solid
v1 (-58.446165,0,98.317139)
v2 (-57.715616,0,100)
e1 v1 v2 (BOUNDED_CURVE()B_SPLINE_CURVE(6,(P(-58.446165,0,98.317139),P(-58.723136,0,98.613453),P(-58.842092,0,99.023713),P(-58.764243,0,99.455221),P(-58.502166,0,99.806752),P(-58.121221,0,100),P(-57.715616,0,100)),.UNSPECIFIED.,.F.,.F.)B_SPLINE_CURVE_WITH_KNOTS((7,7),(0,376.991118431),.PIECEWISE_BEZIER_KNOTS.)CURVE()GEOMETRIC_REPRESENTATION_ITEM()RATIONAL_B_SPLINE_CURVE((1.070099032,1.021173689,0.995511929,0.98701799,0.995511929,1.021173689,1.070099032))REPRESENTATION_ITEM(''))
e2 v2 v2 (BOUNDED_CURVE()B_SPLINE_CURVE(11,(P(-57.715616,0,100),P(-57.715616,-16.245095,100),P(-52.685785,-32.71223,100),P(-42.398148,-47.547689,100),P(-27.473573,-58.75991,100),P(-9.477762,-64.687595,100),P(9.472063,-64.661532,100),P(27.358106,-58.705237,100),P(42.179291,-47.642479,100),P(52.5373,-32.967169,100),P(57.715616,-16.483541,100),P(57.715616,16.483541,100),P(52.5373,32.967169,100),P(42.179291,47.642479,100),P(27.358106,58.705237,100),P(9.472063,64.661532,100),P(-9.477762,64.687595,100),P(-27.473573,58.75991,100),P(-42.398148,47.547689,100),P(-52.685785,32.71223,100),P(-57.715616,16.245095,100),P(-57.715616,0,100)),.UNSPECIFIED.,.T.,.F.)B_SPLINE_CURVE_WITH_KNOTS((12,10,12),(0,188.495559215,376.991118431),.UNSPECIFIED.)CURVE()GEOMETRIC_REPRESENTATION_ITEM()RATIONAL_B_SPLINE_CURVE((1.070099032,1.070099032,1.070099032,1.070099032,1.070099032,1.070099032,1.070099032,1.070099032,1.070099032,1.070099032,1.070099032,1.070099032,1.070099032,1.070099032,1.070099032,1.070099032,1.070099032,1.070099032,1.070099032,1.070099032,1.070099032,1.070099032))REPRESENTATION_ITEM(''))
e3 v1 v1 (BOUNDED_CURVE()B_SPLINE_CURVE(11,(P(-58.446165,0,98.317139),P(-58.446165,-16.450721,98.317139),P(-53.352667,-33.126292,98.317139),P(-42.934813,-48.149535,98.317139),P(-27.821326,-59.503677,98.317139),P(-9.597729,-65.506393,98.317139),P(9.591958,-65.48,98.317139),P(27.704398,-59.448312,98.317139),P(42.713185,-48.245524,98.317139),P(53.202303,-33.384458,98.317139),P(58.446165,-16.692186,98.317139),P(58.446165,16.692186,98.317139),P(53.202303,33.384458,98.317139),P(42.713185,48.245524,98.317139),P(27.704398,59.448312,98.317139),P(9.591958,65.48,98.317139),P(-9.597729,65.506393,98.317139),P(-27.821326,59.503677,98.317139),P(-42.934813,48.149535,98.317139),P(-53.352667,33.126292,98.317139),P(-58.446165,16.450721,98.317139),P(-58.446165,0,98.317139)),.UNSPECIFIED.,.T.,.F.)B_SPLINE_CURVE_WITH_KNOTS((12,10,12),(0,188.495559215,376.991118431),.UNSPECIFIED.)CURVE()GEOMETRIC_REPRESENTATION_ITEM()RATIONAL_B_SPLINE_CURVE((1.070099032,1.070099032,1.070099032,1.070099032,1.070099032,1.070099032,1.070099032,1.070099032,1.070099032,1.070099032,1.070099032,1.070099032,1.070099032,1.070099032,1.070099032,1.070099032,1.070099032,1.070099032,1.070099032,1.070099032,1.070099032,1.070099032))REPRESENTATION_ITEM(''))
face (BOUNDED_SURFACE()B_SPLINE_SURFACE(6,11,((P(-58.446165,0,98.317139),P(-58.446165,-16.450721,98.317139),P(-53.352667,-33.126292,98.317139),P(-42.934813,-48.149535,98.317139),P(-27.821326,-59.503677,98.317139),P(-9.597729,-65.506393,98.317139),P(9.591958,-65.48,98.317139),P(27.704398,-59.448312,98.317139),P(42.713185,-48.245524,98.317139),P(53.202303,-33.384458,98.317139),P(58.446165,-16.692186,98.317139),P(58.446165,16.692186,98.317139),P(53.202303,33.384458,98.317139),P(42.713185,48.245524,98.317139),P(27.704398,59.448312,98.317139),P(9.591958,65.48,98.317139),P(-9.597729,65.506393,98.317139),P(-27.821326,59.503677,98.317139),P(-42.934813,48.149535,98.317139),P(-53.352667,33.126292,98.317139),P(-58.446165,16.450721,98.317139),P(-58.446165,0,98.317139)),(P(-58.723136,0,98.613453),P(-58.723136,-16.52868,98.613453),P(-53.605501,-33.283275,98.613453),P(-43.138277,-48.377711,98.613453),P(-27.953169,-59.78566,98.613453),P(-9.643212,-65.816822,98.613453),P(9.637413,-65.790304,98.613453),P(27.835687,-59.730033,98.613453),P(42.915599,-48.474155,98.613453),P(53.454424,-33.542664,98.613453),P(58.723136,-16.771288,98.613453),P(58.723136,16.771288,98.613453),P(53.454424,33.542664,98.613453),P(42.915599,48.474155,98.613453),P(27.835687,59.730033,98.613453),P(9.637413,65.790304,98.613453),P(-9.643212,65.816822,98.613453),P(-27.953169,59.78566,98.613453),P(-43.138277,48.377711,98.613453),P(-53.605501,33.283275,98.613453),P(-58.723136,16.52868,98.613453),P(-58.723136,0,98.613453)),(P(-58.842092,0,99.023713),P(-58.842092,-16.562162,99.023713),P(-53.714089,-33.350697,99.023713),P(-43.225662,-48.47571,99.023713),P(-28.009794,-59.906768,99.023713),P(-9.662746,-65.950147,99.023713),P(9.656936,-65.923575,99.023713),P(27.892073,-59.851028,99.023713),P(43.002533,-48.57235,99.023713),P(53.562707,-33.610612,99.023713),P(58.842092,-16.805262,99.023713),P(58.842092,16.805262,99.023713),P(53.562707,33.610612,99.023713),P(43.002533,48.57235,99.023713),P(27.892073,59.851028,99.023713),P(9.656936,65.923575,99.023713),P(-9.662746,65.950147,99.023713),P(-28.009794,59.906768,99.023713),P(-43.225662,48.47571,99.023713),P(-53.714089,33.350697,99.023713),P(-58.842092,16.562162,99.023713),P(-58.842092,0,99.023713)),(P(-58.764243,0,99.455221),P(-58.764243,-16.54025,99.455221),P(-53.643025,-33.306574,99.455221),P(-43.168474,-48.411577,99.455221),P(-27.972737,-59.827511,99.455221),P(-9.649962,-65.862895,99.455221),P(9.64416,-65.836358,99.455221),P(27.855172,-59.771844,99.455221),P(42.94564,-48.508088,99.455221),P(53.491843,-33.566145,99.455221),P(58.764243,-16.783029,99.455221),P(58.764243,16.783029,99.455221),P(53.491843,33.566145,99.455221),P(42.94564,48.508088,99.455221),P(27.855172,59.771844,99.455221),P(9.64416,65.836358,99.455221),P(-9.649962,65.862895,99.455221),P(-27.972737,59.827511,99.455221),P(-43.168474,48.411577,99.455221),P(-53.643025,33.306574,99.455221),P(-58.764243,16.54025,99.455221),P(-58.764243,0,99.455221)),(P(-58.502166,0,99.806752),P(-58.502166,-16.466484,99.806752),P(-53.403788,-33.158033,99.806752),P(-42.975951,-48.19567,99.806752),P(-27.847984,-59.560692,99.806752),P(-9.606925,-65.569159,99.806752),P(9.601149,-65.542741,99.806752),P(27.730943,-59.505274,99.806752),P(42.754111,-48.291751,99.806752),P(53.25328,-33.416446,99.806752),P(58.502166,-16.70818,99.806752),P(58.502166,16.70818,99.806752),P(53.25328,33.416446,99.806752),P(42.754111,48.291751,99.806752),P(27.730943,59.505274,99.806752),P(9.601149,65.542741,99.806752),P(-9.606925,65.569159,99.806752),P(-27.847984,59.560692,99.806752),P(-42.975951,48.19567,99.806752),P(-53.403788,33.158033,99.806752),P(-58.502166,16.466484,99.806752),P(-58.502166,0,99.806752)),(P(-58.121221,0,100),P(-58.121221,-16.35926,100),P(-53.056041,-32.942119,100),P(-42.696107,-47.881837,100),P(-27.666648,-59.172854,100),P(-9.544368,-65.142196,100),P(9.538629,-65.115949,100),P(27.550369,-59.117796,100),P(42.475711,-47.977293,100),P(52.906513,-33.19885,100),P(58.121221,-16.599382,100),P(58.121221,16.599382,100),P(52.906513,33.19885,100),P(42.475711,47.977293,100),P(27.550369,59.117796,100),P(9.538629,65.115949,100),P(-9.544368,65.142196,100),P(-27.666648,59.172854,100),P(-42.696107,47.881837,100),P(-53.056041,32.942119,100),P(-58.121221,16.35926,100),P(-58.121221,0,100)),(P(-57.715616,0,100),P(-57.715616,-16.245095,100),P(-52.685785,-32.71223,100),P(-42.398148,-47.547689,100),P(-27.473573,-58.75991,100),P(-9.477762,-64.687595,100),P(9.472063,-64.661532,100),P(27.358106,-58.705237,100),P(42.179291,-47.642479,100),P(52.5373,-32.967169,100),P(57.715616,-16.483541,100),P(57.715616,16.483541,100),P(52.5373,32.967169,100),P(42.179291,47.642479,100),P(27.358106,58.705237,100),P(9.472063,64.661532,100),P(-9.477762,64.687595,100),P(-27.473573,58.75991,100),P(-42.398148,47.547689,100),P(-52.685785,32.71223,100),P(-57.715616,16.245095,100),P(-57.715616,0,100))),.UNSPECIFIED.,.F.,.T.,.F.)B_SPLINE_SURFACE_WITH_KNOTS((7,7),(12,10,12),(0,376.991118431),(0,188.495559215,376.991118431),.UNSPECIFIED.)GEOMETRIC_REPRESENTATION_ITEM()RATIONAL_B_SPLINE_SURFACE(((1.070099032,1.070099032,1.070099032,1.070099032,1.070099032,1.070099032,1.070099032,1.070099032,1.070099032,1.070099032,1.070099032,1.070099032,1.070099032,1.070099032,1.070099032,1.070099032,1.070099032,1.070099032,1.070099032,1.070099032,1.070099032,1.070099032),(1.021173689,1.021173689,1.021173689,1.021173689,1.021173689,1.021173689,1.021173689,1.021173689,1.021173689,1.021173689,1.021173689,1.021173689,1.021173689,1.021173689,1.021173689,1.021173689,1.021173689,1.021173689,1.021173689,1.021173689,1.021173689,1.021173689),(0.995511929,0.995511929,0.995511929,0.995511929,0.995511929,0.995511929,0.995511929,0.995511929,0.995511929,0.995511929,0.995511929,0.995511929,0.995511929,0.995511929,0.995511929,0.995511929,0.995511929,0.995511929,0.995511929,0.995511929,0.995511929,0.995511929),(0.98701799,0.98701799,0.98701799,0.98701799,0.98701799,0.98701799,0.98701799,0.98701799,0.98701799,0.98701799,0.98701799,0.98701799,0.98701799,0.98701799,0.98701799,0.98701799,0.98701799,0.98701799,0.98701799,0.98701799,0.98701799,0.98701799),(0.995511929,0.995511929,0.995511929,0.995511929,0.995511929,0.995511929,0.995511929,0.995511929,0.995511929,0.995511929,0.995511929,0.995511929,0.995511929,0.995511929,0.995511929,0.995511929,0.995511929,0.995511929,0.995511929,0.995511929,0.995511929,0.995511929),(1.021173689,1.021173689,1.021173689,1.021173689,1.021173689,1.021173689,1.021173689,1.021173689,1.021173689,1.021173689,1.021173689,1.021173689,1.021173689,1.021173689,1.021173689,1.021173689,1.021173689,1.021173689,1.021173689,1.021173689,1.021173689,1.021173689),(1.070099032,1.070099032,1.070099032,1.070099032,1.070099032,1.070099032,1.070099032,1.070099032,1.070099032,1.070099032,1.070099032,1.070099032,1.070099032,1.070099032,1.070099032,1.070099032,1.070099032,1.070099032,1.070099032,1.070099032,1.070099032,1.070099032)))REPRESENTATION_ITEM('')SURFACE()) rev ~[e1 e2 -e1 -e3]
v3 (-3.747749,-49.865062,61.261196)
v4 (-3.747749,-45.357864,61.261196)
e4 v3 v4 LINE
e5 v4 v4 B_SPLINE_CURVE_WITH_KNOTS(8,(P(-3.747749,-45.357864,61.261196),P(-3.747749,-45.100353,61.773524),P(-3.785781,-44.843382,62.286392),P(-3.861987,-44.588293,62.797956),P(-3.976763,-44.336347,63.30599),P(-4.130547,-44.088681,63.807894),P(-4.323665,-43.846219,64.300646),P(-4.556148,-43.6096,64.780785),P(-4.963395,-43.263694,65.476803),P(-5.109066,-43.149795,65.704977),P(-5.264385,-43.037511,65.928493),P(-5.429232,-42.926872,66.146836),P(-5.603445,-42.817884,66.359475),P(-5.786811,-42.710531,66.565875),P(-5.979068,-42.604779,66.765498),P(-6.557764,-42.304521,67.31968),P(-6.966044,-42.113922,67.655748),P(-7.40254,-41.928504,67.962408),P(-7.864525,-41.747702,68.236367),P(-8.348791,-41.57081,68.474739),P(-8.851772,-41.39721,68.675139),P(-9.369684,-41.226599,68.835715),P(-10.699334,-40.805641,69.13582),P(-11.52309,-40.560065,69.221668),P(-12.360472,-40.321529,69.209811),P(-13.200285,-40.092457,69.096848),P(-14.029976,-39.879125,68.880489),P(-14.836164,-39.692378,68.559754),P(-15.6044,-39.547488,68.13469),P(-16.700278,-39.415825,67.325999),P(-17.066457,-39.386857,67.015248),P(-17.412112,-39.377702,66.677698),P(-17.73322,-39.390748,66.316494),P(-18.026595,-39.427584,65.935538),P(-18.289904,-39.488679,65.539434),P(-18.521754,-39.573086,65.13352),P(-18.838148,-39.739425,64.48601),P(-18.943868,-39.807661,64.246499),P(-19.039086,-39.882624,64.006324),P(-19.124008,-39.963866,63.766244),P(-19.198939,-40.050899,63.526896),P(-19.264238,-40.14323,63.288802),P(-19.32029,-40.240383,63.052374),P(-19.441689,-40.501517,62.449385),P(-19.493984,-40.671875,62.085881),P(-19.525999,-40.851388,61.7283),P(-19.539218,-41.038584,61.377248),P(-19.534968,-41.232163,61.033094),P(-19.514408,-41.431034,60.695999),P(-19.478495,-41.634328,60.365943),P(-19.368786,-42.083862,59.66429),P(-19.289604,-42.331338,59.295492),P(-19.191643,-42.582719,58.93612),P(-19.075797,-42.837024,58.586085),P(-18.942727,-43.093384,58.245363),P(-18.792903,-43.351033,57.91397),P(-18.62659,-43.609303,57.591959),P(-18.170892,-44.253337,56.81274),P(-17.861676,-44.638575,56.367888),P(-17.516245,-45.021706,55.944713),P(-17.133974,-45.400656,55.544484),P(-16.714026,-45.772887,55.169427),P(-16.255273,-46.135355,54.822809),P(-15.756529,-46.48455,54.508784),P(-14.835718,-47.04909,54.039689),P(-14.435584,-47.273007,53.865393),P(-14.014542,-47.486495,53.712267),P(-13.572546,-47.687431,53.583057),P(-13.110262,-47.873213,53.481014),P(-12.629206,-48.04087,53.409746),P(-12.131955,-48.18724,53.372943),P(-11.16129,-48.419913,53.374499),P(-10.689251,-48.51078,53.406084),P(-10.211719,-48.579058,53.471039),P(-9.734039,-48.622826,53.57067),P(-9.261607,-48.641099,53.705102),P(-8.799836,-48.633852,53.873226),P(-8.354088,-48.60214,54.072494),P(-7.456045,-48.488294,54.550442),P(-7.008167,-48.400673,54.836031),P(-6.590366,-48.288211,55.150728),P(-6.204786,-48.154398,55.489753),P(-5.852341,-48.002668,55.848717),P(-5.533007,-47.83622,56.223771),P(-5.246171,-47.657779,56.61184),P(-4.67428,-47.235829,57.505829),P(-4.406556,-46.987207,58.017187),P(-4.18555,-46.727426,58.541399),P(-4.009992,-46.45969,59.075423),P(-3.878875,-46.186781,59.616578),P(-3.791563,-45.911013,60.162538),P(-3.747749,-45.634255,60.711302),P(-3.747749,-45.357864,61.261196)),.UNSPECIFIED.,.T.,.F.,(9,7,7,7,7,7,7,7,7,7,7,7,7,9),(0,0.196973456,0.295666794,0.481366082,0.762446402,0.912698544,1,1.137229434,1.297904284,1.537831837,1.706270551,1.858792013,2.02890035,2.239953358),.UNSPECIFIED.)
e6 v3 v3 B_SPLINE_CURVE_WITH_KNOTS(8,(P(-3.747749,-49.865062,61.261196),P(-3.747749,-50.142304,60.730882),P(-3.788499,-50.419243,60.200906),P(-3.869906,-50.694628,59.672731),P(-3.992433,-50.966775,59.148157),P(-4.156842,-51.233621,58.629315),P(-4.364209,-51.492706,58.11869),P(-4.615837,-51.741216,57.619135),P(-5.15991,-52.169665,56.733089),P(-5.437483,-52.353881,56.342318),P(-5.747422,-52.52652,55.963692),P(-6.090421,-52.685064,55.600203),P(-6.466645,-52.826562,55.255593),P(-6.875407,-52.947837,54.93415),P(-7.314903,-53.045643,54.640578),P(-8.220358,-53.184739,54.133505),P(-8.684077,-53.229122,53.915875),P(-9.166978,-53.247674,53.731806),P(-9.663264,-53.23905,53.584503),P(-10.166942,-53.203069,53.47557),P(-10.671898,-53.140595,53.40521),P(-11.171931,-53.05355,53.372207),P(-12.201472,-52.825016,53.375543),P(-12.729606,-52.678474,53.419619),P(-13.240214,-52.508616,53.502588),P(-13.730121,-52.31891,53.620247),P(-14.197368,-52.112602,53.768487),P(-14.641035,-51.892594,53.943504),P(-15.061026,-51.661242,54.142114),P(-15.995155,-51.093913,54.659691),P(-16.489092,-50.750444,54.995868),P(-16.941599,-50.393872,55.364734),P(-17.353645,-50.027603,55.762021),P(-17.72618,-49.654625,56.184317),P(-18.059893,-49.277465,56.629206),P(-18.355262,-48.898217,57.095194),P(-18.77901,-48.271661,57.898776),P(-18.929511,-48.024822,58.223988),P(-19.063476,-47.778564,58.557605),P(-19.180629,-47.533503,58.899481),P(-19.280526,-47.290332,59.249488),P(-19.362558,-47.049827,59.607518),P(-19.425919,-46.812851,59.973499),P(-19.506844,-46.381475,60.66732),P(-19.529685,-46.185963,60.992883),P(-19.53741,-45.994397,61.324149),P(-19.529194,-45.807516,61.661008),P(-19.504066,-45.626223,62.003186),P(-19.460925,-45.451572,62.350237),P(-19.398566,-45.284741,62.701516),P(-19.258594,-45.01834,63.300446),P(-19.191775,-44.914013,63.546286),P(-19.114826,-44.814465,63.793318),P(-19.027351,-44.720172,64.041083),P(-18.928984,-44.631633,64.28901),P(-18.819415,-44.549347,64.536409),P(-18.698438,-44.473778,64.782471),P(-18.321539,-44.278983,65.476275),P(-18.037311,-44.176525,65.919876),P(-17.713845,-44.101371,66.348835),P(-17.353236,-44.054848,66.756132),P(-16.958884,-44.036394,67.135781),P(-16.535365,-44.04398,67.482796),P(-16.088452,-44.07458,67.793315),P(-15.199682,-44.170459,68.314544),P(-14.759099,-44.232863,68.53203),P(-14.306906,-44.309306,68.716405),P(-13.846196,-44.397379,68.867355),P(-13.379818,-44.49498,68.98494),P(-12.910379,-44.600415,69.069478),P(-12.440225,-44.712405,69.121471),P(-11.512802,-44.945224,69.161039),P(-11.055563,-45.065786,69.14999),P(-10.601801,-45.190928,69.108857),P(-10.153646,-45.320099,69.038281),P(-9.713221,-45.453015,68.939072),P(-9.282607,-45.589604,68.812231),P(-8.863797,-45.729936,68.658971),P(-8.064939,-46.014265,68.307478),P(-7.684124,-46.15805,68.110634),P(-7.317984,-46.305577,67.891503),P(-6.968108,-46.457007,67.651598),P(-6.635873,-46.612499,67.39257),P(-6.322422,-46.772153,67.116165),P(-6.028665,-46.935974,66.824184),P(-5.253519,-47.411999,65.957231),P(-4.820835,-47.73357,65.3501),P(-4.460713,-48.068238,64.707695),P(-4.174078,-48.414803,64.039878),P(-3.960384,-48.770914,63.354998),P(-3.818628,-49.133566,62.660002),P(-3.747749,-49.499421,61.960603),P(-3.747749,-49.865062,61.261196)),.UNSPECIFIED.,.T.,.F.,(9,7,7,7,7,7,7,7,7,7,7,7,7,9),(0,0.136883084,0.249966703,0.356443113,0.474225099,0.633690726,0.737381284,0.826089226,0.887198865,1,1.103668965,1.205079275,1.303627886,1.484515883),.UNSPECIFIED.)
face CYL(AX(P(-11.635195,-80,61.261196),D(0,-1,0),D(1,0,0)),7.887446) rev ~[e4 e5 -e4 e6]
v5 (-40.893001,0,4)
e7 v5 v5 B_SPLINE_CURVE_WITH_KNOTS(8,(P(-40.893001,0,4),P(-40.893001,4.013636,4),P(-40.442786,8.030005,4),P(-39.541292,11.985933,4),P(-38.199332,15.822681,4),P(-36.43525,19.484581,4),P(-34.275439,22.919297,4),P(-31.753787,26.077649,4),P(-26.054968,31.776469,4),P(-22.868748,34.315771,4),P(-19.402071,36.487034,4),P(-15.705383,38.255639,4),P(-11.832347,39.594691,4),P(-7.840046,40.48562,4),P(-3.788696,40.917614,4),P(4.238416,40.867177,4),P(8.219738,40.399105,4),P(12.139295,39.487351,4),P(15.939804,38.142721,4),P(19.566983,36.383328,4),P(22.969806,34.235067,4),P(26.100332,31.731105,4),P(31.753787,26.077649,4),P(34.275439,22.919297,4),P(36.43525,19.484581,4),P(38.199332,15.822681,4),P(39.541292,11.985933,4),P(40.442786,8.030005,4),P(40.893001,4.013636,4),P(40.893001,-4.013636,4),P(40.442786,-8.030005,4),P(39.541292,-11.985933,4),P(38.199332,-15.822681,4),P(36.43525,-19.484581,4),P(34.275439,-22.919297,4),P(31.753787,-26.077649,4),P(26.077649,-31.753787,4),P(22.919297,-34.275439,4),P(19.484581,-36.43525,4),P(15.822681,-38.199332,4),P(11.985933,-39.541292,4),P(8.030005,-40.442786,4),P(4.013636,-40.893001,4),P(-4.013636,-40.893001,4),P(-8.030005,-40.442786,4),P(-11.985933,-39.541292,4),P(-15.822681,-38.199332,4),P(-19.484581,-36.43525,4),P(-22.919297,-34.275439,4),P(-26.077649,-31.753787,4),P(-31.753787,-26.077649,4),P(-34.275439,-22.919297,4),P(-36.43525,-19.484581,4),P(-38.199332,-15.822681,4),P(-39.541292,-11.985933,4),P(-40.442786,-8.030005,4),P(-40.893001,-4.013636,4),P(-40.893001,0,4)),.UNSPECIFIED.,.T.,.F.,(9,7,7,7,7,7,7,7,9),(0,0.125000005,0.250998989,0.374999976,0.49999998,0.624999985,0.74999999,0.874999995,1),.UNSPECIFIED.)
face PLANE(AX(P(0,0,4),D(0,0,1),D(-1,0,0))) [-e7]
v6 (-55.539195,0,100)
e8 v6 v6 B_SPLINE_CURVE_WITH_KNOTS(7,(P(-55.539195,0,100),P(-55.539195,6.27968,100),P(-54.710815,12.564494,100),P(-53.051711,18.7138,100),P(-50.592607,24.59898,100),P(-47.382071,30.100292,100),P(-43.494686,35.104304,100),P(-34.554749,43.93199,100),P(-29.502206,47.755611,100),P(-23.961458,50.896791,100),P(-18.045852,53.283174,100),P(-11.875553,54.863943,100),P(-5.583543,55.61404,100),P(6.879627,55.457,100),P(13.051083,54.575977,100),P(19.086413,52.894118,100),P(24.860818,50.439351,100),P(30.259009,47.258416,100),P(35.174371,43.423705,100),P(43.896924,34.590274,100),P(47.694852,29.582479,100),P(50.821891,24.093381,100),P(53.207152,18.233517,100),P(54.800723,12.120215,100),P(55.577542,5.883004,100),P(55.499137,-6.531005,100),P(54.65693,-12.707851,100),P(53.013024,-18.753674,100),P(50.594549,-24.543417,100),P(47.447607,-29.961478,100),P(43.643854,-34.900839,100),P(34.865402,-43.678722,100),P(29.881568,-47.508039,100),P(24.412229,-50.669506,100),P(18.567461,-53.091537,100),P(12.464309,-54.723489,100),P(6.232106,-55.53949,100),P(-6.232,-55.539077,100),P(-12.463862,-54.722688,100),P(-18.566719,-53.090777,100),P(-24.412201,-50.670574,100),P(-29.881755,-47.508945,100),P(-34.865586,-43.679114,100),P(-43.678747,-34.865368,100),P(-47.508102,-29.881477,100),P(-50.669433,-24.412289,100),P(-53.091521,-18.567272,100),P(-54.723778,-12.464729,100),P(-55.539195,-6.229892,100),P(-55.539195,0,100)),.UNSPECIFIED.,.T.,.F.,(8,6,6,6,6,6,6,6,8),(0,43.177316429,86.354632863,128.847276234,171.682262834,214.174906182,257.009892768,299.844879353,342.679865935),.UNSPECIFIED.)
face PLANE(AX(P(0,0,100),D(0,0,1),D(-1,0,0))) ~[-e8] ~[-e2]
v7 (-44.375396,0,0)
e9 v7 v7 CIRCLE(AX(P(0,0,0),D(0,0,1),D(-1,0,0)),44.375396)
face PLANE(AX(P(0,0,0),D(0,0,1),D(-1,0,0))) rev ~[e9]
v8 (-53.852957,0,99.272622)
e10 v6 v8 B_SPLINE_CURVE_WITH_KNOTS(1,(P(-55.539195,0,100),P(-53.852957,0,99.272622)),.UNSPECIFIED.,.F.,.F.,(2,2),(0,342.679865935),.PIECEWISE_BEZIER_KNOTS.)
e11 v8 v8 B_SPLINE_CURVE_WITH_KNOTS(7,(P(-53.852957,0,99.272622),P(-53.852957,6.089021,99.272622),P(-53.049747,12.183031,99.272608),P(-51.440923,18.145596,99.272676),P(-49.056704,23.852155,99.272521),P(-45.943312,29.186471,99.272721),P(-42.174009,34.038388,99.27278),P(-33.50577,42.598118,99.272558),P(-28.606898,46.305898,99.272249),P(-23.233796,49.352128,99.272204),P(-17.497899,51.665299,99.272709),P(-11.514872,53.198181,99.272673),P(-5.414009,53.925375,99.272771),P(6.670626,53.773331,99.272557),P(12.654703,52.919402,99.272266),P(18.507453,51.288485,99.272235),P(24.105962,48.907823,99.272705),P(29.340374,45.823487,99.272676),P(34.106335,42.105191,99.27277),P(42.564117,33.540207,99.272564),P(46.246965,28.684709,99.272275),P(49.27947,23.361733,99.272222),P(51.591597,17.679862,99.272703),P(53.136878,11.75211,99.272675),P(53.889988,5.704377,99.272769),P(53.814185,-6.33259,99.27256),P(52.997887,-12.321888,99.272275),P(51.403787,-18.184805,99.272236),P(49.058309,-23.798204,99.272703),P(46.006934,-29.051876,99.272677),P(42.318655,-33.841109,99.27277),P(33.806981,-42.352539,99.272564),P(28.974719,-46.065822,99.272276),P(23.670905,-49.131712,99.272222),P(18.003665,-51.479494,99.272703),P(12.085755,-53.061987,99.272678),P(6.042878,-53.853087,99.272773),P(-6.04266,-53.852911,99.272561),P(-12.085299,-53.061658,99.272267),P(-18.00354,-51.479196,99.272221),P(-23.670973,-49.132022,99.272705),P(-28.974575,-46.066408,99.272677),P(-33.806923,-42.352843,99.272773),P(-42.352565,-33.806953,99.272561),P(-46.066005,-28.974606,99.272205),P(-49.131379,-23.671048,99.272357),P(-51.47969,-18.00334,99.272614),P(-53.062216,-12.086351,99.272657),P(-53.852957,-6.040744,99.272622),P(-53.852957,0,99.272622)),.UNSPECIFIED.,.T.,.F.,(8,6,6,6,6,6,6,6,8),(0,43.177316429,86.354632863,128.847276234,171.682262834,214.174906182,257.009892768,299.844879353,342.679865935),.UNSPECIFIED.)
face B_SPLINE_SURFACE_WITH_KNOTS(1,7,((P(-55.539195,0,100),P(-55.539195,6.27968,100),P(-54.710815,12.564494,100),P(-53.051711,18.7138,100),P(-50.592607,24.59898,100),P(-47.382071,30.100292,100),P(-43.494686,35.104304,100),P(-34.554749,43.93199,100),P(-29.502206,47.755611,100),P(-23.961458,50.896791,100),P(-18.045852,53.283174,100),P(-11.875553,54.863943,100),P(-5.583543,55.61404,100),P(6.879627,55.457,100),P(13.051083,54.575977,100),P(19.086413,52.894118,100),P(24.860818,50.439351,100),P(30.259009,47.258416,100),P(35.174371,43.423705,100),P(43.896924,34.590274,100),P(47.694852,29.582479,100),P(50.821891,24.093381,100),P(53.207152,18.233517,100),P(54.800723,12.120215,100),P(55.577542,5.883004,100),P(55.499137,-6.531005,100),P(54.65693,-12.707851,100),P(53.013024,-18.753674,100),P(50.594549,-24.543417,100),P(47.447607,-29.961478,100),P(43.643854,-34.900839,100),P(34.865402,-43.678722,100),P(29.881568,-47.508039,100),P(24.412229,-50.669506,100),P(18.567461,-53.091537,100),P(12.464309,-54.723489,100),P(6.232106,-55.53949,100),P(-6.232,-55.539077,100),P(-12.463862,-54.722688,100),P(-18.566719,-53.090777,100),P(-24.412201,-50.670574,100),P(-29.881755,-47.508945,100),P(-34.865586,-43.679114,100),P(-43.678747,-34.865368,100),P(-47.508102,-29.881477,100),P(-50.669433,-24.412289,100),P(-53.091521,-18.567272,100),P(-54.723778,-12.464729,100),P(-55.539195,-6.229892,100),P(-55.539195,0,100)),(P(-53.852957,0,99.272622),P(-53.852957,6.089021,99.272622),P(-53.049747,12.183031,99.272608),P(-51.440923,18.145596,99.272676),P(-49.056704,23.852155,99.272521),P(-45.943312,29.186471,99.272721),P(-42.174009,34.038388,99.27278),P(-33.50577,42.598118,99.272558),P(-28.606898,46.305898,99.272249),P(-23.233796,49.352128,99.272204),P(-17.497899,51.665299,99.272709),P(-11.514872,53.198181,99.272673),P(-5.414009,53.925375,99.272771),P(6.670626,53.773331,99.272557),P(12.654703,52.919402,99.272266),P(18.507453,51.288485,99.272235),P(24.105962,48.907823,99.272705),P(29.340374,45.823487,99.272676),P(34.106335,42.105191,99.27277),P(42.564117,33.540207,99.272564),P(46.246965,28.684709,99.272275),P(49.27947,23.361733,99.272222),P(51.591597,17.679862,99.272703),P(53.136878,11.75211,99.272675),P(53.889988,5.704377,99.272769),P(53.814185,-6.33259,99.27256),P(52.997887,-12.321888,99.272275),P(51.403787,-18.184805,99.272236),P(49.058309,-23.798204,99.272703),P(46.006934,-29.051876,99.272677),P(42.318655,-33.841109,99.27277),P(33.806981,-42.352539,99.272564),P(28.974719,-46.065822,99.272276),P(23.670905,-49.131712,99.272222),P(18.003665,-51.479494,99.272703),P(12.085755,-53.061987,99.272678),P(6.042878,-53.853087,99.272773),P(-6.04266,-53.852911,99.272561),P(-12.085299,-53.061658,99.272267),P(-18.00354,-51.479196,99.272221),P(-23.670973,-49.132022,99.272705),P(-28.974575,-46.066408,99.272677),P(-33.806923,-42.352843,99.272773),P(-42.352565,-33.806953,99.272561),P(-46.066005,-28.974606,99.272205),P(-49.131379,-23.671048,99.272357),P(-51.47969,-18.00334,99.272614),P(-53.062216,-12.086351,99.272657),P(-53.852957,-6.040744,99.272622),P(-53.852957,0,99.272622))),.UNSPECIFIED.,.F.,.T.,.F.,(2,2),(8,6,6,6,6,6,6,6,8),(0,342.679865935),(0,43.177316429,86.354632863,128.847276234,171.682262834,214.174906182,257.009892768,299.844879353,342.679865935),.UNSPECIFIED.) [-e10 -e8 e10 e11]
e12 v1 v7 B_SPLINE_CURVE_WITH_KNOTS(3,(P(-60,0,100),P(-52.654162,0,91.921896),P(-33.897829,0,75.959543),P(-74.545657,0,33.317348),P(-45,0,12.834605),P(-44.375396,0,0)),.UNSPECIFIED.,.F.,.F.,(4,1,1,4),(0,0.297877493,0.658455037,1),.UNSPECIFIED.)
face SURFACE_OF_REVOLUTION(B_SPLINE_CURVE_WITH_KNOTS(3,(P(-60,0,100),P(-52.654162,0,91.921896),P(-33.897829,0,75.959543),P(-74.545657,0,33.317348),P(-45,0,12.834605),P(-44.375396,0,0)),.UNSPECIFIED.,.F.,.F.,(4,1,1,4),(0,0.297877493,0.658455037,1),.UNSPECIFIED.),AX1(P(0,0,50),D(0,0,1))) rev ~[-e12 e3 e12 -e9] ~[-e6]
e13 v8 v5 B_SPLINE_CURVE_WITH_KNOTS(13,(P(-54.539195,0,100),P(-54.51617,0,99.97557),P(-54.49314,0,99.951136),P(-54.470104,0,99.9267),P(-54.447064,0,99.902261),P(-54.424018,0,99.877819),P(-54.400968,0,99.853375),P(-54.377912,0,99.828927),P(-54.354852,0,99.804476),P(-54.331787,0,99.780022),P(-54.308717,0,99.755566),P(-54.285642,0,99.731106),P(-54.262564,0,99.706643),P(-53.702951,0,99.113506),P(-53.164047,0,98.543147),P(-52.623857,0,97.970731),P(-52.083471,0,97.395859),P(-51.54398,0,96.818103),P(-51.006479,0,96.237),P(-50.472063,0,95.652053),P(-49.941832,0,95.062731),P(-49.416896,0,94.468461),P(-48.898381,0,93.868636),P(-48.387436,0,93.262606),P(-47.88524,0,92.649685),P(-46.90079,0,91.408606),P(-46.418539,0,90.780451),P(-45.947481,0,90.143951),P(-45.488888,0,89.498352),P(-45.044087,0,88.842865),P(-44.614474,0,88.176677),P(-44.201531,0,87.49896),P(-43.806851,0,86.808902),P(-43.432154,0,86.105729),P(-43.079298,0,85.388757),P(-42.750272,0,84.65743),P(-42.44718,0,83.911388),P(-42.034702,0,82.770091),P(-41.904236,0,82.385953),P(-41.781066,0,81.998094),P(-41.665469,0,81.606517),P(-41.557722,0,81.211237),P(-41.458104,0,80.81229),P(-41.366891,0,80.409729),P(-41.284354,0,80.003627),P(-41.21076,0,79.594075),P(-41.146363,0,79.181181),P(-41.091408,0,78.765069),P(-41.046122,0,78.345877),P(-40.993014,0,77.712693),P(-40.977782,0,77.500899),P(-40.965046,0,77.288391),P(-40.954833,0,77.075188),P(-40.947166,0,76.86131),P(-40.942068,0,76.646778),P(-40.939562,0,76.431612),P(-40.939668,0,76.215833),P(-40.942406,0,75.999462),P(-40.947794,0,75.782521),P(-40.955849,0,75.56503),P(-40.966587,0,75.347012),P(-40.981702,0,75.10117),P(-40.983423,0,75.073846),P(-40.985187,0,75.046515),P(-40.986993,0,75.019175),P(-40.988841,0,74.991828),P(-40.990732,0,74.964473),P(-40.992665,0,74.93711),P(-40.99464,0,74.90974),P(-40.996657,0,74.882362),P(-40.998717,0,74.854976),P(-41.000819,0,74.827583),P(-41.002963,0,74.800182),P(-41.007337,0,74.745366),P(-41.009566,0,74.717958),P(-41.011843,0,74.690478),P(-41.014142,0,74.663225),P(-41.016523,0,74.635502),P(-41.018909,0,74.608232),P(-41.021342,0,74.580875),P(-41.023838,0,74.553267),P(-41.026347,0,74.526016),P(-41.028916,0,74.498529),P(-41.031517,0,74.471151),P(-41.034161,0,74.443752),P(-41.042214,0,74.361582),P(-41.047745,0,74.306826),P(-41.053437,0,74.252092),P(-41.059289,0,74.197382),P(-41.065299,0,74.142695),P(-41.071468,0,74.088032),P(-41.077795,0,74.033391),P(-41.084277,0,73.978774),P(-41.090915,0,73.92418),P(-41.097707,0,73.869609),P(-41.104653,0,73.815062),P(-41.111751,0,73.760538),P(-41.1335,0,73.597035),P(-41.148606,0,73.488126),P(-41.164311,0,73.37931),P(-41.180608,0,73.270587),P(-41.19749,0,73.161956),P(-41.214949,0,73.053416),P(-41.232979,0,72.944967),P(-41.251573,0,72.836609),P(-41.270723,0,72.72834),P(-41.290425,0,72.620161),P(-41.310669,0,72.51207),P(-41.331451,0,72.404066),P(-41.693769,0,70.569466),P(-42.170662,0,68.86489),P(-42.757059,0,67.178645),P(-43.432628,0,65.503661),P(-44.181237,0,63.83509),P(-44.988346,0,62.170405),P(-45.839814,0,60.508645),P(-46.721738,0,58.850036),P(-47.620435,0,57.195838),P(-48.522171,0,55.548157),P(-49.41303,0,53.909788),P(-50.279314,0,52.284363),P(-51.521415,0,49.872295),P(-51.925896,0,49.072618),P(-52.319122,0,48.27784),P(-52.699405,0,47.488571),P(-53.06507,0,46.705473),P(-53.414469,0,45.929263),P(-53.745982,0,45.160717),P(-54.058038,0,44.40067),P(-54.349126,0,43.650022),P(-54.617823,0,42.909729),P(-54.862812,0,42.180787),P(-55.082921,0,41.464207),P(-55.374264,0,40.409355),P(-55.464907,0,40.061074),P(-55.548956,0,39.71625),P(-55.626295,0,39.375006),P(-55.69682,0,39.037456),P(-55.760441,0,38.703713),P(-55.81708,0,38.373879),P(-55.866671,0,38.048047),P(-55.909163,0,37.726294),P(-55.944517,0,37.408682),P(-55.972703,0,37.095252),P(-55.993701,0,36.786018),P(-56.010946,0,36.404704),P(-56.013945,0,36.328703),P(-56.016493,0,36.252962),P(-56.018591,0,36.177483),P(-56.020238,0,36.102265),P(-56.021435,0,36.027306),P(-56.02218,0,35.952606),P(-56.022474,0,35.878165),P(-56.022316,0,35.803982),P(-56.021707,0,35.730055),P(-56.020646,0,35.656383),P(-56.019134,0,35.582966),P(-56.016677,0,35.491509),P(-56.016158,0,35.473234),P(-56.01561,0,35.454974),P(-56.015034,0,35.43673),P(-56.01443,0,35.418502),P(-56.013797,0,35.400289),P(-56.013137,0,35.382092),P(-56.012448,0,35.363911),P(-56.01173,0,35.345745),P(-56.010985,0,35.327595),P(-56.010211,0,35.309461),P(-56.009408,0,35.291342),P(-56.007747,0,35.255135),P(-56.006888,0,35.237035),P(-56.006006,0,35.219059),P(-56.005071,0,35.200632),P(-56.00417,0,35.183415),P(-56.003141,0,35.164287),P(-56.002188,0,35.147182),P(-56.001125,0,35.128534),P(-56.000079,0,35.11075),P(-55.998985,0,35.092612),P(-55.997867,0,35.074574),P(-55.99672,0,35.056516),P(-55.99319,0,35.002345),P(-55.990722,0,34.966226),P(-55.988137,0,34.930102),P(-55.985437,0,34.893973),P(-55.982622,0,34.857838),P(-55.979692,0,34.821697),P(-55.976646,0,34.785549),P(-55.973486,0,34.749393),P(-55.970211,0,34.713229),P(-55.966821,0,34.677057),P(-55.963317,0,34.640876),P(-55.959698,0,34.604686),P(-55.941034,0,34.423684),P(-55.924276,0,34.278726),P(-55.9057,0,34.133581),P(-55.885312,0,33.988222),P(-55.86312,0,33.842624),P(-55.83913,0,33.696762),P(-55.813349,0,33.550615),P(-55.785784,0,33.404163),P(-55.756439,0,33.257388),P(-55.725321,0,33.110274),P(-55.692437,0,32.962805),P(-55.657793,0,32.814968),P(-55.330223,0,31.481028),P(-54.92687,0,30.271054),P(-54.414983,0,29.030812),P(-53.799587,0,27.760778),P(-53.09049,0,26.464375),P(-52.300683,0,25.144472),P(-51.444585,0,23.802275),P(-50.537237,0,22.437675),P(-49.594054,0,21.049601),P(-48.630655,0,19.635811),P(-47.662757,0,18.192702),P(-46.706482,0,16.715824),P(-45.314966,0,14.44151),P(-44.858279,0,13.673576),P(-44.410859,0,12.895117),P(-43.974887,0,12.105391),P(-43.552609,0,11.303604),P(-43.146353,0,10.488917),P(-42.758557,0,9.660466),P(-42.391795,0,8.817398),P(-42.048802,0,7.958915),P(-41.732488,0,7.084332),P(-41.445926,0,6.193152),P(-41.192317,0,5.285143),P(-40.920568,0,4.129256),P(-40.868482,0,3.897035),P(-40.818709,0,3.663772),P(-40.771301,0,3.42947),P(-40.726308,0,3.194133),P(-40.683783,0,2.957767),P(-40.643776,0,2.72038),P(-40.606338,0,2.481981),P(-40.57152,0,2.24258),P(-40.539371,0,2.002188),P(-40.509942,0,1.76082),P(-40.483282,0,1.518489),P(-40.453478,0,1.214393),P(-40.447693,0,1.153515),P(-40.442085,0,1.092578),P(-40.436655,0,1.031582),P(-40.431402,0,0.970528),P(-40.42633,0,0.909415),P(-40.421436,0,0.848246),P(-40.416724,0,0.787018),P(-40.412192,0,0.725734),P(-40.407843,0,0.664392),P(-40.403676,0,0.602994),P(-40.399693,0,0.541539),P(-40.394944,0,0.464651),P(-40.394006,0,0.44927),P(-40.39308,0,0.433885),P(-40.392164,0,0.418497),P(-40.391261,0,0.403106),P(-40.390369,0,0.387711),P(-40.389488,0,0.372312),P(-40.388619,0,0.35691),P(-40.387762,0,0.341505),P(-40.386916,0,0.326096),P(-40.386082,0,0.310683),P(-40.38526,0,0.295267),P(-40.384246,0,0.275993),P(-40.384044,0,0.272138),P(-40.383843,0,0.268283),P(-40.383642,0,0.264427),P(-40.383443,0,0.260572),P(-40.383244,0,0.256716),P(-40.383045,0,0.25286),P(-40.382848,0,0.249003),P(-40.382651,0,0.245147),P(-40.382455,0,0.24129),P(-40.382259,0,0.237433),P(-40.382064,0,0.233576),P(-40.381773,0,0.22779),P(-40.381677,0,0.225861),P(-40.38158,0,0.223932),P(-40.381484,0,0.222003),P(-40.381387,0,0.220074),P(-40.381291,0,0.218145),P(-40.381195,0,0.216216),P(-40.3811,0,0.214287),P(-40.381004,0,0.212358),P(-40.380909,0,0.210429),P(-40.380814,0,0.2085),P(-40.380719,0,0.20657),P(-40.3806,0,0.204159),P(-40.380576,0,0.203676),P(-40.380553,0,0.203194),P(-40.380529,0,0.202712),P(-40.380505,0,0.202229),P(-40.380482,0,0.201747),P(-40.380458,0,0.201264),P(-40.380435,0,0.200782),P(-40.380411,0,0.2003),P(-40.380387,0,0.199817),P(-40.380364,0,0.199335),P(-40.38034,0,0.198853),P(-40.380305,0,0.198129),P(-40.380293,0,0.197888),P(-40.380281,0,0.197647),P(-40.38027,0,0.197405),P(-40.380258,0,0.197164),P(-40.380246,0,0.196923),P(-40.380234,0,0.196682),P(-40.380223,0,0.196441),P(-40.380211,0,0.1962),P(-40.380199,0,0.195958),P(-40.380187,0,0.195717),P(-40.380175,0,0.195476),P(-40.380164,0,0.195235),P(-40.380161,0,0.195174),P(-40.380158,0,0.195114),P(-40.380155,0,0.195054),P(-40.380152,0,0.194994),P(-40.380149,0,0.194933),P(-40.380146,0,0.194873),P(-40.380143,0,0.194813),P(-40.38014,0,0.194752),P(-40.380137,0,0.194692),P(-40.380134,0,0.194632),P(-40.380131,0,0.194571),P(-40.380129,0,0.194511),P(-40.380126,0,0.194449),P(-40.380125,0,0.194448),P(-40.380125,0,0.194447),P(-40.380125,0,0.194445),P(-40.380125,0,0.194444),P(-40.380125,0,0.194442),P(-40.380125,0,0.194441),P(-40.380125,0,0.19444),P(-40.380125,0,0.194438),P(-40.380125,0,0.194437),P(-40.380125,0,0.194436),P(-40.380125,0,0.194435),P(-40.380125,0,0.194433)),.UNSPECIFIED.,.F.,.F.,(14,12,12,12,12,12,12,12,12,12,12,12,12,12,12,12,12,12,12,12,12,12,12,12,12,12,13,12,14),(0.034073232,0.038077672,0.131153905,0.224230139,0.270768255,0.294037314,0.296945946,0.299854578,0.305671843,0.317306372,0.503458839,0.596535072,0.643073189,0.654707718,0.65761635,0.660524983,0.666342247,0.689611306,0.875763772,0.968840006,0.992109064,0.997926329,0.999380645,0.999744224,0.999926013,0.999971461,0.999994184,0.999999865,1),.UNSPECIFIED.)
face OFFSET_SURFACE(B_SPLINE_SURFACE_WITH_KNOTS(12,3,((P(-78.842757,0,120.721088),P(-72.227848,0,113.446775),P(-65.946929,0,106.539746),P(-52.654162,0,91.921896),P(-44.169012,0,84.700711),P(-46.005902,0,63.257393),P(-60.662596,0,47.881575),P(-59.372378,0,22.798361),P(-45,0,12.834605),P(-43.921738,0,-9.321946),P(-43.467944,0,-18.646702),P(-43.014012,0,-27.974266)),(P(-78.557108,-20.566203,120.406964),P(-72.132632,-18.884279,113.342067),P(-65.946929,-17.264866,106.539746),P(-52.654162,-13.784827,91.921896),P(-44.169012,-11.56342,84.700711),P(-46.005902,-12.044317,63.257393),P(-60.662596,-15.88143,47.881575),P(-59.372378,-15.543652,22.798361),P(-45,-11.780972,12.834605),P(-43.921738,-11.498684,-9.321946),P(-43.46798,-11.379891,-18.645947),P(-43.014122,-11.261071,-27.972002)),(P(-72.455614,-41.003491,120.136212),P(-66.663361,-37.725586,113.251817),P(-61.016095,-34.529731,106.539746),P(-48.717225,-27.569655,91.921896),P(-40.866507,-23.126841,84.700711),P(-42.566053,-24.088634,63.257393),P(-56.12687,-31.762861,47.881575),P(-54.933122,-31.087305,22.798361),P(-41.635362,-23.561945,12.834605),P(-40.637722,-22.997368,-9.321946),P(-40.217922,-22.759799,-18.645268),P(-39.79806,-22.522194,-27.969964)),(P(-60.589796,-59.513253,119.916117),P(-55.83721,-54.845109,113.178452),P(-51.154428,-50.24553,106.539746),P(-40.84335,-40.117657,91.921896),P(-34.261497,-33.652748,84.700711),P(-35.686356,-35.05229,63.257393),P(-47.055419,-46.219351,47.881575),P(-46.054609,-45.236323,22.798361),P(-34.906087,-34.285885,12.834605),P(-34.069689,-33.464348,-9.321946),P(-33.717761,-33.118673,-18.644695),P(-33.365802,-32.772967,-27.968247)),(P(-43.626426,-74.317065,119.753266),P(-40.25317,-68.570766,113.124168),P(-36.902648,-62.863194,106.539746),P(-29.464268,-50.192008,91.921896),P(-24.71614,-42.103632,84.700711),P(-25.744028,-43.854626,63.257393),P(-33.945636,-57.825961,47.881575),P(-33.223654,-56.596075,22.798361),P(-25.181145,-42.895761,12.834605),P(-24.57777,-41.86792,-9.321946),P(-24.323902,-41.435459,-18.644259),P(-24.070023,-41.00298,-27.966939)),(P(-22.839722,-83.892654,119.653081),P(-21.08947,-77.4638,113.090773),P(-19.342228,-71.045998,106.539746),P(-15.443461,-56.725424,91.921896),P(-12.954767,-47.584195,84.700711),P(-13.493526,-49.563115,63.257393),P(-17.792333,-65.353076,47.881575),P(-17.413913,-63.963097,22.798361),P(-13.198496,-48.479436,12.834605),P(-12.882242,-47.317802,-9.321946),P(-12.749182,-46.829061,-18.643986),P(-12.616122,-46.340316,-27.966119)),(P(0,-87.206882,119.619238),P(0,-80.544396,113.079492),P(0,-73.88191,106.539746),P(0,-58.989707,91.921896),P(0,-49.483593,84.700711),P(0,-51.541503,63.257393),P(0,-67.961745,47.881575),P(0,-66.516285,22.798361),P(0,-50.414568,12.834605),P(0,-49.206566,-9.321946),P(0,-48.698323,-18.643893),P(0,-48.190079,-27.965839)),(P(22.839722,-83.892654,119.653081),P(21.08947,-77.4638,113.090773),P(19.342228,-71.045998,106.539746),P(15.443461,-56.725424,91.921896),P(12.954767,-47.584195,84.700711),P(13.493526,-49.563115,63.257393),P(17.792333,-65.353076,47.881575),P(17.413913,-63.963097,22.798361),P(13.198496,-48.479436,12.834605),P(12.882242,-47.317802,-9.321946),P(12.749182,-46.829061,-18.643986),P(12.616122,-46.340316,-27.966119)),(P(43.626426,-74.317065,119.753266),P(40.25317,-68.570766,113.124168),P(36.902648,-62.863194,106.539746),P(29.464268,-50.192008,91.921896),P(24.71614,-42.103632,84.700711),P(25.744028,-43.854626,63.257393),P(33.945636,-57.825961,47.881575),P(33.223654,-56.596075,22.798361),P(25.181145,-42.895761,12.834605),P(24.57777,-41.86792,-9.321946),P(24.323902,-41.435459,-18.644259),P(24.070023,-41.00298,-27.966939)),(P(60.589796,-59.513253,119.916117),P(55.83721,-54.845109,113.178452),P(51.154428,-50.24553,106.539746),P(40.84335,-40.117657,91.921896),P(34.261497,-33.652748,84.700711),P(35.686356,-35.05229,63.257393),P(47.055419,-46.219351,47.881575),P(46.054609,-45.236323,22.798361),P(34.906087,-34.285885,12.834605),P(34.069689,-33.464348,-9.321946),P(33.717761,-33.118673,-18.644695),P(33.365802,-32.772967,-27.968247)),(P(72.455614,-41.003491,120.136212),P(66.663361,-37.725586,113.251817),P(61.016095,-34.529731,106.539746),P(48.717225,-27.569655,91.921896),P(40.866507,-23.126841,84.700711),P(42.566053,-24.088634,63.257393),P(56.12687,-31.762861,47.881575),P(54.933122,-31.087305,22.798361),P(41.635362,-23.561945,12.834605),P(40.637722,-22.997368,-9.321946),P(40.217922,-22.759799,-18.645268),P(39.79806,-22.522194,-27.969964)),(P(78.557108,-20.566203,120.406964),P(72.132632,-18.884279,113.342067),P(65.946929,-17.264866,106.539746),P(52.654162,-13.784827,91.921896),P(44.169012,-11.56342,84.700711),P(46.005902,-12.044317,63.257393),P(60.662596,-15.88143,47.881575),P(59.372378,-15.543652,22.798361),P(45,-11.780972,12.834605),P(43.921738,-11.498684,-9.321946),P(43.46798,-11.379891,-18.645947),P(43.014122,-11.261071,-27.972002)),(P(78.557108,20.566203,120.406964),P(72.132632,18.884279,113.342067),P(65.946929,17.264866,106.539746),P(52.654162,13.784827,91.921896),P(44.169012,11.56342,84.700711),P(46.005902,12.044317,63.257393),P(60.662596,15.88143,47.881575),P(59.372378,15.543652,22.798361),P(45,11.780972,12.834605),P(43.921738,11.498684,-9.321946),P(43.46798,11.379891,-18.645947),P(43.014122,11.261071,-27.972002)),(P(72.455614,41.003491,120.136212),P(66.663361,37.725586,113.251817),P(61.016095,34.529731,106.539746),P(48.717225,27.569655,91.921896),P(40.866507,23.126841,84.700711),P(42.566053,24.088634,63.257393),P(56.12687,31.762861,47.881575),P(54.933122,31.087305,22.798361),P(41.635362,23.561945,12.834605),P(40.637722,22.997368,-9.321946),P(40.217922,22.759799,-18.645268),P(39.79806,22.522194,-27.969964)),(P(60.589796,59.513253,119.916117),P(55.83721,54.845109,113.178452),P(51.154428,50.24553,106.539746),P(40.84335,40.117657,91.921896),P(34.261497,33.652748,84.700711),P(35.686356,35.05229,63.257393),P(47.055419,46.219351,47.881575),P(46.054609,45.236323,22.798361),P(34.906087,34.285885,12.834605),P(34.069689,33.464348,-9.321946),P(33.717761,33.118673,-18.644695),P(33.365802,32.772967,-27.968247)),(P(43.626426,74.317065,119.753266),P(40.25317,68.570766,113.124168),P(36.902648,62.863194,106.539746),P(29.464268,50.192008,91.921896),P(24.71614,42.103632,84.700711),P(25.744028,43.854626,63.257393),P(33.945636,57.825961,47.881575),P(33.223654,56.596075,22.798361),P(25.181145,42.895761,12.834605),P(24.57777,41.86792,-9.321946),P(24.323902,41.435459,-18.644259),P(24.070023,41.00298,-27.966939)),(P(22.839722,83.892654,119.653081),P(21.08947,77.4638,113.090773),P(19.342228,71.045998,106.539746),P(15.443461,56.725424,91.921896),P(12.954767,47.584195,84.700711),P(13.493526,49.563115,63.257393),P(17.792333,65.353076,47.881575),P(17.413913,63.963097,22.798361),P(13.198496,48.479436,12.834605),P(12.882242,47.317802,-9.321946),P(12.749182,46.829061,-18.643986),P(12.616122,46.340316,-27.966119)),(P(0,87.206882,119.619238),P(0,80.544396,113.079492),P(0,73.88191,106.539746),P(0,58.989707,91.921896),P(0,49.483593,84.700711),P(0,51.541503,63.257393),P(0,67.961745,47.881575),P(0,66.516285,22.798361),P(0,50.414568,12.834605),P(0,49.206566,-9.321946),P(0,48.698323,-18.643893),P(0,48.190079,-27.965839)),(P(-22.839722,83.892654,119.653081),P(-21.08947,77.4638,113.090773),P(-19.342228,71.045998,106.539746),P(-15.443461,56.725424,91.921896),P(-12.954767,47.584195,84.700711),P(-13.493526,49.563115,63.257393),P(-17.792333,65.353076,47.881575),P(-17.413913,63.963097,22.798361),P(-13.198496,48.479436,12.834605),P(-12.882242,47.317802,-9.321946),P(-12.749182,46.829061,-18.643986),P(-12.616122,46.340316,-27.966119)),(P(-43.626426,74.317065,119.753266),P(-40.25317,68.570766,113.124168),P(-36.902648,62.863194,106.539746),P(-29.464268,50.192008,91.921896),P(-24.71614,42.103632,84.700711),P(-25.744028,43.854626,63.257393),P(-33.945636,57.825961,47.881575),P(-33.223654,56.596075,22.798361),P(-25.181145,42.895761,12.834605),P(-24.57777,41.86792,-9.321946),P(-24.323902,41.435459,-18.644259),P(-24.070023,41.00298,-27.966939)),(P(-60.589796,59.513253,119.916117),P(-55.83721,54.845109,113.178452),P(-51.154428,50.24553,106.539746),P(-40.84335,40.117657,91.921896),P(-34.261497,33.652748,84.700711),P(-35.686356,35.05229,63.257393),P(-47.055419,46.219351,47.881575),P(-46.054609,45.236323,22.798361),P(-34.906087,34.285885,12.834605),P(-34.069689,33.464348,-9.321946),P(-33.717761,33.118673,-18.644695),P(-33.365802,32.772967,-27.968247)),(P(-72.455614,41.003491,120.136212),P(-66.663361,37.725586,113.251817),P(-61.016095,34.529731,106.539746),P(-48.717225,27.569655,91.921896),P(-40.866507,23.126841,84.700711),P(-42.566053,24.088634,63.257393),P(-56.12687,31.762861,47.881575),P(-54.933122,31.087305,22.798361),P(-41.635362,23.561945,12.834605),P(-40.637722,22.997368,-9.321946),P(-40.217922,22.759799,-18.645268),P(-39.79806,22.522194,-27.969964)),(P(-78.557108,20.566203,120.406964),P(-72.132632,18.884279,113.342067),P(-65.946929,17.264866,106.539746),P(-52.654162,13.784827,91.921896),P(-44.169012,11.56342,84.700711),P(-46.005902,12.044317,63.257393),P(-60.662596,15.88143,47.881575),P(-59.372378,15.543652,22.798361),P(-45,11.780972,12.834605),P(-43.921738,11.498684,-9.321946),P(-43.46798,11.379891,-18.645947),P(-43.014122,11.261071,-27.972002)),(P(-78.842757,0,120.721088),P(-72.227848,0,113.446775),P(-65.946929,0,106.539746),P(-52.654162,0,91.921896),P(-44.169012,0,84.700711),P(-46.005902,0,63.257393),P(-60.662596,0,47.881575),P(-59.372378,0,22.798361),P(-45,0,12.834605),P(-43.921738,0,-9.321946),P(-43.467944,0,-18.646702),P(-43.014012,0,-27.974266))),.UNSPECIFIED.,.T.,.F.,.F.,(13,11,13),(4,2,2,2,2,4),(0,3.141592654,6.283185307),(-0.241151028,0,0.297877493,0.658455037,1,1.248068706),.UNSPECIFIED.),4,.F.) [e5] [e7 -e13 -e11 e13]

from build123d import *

# Parameters (mm, degrees)
F2_T     = -4
F3_R     = 1
F4_SIZE  = 1
F6_R     = 7.8874463413
F7_DEPTH = 50


with BuildPart() as f1:
    # F0 (on Front) → F1 (revolve)
    with BuildSketch(Plane.XZ):
        with BuildLine():
            Line((-44.3753963917, 0), (0, 0))
            Line((0, 0), (0, 100))
            Line((0, 100), (-60, 100))
            add(Edge.make_bspline(
                [(-60, 100), (-52.6541621731, 91.9218958662), (-33.8978285257, 75.9595428014), (-74.5456569157, 33.3173476275), (-45, 12.8346048295), (-44.3753963917, 0)],
                knots=[0, 0, 0, 0, 0.297877493, 0.6584550367, 1, 1, 1, 1], degree=3))
        make_face()
    revolve(axis=Axis((0, 0, 50), (0, 0, 1)))

    # F2
    f2_openings = [f1.faces().sort_by_distance(p)[0] for p in [
        (0, 0, 100),
    ]]
    offset(amount=F2_T, openings=f2_openings)

    # F3
    f3_edges = [f1.edges().sort_by_distance(p)[0] for p in [
        (60, 0, 100),
    ]]
    fillet(f3_edges, radius=F3_R)

    # F4
    f4_edges = [f1.edges().sort_by_distance(p)[0] for p in [
        (54.539195, 0, 100),
    ]]
    chamfer(f4_edges, length=F4_SIZE)

    # F6 (on offset) → F7 (cut)
    with BuildSketch(Plane.XZ.offset(80)):
        with Locations((-11.6351954639, 61.2611956894)):
            Circle(F6_R)
    extrude(amount=-F7_DEPTH, mode=Mode.SUBTRACT)


solid = f1.part
